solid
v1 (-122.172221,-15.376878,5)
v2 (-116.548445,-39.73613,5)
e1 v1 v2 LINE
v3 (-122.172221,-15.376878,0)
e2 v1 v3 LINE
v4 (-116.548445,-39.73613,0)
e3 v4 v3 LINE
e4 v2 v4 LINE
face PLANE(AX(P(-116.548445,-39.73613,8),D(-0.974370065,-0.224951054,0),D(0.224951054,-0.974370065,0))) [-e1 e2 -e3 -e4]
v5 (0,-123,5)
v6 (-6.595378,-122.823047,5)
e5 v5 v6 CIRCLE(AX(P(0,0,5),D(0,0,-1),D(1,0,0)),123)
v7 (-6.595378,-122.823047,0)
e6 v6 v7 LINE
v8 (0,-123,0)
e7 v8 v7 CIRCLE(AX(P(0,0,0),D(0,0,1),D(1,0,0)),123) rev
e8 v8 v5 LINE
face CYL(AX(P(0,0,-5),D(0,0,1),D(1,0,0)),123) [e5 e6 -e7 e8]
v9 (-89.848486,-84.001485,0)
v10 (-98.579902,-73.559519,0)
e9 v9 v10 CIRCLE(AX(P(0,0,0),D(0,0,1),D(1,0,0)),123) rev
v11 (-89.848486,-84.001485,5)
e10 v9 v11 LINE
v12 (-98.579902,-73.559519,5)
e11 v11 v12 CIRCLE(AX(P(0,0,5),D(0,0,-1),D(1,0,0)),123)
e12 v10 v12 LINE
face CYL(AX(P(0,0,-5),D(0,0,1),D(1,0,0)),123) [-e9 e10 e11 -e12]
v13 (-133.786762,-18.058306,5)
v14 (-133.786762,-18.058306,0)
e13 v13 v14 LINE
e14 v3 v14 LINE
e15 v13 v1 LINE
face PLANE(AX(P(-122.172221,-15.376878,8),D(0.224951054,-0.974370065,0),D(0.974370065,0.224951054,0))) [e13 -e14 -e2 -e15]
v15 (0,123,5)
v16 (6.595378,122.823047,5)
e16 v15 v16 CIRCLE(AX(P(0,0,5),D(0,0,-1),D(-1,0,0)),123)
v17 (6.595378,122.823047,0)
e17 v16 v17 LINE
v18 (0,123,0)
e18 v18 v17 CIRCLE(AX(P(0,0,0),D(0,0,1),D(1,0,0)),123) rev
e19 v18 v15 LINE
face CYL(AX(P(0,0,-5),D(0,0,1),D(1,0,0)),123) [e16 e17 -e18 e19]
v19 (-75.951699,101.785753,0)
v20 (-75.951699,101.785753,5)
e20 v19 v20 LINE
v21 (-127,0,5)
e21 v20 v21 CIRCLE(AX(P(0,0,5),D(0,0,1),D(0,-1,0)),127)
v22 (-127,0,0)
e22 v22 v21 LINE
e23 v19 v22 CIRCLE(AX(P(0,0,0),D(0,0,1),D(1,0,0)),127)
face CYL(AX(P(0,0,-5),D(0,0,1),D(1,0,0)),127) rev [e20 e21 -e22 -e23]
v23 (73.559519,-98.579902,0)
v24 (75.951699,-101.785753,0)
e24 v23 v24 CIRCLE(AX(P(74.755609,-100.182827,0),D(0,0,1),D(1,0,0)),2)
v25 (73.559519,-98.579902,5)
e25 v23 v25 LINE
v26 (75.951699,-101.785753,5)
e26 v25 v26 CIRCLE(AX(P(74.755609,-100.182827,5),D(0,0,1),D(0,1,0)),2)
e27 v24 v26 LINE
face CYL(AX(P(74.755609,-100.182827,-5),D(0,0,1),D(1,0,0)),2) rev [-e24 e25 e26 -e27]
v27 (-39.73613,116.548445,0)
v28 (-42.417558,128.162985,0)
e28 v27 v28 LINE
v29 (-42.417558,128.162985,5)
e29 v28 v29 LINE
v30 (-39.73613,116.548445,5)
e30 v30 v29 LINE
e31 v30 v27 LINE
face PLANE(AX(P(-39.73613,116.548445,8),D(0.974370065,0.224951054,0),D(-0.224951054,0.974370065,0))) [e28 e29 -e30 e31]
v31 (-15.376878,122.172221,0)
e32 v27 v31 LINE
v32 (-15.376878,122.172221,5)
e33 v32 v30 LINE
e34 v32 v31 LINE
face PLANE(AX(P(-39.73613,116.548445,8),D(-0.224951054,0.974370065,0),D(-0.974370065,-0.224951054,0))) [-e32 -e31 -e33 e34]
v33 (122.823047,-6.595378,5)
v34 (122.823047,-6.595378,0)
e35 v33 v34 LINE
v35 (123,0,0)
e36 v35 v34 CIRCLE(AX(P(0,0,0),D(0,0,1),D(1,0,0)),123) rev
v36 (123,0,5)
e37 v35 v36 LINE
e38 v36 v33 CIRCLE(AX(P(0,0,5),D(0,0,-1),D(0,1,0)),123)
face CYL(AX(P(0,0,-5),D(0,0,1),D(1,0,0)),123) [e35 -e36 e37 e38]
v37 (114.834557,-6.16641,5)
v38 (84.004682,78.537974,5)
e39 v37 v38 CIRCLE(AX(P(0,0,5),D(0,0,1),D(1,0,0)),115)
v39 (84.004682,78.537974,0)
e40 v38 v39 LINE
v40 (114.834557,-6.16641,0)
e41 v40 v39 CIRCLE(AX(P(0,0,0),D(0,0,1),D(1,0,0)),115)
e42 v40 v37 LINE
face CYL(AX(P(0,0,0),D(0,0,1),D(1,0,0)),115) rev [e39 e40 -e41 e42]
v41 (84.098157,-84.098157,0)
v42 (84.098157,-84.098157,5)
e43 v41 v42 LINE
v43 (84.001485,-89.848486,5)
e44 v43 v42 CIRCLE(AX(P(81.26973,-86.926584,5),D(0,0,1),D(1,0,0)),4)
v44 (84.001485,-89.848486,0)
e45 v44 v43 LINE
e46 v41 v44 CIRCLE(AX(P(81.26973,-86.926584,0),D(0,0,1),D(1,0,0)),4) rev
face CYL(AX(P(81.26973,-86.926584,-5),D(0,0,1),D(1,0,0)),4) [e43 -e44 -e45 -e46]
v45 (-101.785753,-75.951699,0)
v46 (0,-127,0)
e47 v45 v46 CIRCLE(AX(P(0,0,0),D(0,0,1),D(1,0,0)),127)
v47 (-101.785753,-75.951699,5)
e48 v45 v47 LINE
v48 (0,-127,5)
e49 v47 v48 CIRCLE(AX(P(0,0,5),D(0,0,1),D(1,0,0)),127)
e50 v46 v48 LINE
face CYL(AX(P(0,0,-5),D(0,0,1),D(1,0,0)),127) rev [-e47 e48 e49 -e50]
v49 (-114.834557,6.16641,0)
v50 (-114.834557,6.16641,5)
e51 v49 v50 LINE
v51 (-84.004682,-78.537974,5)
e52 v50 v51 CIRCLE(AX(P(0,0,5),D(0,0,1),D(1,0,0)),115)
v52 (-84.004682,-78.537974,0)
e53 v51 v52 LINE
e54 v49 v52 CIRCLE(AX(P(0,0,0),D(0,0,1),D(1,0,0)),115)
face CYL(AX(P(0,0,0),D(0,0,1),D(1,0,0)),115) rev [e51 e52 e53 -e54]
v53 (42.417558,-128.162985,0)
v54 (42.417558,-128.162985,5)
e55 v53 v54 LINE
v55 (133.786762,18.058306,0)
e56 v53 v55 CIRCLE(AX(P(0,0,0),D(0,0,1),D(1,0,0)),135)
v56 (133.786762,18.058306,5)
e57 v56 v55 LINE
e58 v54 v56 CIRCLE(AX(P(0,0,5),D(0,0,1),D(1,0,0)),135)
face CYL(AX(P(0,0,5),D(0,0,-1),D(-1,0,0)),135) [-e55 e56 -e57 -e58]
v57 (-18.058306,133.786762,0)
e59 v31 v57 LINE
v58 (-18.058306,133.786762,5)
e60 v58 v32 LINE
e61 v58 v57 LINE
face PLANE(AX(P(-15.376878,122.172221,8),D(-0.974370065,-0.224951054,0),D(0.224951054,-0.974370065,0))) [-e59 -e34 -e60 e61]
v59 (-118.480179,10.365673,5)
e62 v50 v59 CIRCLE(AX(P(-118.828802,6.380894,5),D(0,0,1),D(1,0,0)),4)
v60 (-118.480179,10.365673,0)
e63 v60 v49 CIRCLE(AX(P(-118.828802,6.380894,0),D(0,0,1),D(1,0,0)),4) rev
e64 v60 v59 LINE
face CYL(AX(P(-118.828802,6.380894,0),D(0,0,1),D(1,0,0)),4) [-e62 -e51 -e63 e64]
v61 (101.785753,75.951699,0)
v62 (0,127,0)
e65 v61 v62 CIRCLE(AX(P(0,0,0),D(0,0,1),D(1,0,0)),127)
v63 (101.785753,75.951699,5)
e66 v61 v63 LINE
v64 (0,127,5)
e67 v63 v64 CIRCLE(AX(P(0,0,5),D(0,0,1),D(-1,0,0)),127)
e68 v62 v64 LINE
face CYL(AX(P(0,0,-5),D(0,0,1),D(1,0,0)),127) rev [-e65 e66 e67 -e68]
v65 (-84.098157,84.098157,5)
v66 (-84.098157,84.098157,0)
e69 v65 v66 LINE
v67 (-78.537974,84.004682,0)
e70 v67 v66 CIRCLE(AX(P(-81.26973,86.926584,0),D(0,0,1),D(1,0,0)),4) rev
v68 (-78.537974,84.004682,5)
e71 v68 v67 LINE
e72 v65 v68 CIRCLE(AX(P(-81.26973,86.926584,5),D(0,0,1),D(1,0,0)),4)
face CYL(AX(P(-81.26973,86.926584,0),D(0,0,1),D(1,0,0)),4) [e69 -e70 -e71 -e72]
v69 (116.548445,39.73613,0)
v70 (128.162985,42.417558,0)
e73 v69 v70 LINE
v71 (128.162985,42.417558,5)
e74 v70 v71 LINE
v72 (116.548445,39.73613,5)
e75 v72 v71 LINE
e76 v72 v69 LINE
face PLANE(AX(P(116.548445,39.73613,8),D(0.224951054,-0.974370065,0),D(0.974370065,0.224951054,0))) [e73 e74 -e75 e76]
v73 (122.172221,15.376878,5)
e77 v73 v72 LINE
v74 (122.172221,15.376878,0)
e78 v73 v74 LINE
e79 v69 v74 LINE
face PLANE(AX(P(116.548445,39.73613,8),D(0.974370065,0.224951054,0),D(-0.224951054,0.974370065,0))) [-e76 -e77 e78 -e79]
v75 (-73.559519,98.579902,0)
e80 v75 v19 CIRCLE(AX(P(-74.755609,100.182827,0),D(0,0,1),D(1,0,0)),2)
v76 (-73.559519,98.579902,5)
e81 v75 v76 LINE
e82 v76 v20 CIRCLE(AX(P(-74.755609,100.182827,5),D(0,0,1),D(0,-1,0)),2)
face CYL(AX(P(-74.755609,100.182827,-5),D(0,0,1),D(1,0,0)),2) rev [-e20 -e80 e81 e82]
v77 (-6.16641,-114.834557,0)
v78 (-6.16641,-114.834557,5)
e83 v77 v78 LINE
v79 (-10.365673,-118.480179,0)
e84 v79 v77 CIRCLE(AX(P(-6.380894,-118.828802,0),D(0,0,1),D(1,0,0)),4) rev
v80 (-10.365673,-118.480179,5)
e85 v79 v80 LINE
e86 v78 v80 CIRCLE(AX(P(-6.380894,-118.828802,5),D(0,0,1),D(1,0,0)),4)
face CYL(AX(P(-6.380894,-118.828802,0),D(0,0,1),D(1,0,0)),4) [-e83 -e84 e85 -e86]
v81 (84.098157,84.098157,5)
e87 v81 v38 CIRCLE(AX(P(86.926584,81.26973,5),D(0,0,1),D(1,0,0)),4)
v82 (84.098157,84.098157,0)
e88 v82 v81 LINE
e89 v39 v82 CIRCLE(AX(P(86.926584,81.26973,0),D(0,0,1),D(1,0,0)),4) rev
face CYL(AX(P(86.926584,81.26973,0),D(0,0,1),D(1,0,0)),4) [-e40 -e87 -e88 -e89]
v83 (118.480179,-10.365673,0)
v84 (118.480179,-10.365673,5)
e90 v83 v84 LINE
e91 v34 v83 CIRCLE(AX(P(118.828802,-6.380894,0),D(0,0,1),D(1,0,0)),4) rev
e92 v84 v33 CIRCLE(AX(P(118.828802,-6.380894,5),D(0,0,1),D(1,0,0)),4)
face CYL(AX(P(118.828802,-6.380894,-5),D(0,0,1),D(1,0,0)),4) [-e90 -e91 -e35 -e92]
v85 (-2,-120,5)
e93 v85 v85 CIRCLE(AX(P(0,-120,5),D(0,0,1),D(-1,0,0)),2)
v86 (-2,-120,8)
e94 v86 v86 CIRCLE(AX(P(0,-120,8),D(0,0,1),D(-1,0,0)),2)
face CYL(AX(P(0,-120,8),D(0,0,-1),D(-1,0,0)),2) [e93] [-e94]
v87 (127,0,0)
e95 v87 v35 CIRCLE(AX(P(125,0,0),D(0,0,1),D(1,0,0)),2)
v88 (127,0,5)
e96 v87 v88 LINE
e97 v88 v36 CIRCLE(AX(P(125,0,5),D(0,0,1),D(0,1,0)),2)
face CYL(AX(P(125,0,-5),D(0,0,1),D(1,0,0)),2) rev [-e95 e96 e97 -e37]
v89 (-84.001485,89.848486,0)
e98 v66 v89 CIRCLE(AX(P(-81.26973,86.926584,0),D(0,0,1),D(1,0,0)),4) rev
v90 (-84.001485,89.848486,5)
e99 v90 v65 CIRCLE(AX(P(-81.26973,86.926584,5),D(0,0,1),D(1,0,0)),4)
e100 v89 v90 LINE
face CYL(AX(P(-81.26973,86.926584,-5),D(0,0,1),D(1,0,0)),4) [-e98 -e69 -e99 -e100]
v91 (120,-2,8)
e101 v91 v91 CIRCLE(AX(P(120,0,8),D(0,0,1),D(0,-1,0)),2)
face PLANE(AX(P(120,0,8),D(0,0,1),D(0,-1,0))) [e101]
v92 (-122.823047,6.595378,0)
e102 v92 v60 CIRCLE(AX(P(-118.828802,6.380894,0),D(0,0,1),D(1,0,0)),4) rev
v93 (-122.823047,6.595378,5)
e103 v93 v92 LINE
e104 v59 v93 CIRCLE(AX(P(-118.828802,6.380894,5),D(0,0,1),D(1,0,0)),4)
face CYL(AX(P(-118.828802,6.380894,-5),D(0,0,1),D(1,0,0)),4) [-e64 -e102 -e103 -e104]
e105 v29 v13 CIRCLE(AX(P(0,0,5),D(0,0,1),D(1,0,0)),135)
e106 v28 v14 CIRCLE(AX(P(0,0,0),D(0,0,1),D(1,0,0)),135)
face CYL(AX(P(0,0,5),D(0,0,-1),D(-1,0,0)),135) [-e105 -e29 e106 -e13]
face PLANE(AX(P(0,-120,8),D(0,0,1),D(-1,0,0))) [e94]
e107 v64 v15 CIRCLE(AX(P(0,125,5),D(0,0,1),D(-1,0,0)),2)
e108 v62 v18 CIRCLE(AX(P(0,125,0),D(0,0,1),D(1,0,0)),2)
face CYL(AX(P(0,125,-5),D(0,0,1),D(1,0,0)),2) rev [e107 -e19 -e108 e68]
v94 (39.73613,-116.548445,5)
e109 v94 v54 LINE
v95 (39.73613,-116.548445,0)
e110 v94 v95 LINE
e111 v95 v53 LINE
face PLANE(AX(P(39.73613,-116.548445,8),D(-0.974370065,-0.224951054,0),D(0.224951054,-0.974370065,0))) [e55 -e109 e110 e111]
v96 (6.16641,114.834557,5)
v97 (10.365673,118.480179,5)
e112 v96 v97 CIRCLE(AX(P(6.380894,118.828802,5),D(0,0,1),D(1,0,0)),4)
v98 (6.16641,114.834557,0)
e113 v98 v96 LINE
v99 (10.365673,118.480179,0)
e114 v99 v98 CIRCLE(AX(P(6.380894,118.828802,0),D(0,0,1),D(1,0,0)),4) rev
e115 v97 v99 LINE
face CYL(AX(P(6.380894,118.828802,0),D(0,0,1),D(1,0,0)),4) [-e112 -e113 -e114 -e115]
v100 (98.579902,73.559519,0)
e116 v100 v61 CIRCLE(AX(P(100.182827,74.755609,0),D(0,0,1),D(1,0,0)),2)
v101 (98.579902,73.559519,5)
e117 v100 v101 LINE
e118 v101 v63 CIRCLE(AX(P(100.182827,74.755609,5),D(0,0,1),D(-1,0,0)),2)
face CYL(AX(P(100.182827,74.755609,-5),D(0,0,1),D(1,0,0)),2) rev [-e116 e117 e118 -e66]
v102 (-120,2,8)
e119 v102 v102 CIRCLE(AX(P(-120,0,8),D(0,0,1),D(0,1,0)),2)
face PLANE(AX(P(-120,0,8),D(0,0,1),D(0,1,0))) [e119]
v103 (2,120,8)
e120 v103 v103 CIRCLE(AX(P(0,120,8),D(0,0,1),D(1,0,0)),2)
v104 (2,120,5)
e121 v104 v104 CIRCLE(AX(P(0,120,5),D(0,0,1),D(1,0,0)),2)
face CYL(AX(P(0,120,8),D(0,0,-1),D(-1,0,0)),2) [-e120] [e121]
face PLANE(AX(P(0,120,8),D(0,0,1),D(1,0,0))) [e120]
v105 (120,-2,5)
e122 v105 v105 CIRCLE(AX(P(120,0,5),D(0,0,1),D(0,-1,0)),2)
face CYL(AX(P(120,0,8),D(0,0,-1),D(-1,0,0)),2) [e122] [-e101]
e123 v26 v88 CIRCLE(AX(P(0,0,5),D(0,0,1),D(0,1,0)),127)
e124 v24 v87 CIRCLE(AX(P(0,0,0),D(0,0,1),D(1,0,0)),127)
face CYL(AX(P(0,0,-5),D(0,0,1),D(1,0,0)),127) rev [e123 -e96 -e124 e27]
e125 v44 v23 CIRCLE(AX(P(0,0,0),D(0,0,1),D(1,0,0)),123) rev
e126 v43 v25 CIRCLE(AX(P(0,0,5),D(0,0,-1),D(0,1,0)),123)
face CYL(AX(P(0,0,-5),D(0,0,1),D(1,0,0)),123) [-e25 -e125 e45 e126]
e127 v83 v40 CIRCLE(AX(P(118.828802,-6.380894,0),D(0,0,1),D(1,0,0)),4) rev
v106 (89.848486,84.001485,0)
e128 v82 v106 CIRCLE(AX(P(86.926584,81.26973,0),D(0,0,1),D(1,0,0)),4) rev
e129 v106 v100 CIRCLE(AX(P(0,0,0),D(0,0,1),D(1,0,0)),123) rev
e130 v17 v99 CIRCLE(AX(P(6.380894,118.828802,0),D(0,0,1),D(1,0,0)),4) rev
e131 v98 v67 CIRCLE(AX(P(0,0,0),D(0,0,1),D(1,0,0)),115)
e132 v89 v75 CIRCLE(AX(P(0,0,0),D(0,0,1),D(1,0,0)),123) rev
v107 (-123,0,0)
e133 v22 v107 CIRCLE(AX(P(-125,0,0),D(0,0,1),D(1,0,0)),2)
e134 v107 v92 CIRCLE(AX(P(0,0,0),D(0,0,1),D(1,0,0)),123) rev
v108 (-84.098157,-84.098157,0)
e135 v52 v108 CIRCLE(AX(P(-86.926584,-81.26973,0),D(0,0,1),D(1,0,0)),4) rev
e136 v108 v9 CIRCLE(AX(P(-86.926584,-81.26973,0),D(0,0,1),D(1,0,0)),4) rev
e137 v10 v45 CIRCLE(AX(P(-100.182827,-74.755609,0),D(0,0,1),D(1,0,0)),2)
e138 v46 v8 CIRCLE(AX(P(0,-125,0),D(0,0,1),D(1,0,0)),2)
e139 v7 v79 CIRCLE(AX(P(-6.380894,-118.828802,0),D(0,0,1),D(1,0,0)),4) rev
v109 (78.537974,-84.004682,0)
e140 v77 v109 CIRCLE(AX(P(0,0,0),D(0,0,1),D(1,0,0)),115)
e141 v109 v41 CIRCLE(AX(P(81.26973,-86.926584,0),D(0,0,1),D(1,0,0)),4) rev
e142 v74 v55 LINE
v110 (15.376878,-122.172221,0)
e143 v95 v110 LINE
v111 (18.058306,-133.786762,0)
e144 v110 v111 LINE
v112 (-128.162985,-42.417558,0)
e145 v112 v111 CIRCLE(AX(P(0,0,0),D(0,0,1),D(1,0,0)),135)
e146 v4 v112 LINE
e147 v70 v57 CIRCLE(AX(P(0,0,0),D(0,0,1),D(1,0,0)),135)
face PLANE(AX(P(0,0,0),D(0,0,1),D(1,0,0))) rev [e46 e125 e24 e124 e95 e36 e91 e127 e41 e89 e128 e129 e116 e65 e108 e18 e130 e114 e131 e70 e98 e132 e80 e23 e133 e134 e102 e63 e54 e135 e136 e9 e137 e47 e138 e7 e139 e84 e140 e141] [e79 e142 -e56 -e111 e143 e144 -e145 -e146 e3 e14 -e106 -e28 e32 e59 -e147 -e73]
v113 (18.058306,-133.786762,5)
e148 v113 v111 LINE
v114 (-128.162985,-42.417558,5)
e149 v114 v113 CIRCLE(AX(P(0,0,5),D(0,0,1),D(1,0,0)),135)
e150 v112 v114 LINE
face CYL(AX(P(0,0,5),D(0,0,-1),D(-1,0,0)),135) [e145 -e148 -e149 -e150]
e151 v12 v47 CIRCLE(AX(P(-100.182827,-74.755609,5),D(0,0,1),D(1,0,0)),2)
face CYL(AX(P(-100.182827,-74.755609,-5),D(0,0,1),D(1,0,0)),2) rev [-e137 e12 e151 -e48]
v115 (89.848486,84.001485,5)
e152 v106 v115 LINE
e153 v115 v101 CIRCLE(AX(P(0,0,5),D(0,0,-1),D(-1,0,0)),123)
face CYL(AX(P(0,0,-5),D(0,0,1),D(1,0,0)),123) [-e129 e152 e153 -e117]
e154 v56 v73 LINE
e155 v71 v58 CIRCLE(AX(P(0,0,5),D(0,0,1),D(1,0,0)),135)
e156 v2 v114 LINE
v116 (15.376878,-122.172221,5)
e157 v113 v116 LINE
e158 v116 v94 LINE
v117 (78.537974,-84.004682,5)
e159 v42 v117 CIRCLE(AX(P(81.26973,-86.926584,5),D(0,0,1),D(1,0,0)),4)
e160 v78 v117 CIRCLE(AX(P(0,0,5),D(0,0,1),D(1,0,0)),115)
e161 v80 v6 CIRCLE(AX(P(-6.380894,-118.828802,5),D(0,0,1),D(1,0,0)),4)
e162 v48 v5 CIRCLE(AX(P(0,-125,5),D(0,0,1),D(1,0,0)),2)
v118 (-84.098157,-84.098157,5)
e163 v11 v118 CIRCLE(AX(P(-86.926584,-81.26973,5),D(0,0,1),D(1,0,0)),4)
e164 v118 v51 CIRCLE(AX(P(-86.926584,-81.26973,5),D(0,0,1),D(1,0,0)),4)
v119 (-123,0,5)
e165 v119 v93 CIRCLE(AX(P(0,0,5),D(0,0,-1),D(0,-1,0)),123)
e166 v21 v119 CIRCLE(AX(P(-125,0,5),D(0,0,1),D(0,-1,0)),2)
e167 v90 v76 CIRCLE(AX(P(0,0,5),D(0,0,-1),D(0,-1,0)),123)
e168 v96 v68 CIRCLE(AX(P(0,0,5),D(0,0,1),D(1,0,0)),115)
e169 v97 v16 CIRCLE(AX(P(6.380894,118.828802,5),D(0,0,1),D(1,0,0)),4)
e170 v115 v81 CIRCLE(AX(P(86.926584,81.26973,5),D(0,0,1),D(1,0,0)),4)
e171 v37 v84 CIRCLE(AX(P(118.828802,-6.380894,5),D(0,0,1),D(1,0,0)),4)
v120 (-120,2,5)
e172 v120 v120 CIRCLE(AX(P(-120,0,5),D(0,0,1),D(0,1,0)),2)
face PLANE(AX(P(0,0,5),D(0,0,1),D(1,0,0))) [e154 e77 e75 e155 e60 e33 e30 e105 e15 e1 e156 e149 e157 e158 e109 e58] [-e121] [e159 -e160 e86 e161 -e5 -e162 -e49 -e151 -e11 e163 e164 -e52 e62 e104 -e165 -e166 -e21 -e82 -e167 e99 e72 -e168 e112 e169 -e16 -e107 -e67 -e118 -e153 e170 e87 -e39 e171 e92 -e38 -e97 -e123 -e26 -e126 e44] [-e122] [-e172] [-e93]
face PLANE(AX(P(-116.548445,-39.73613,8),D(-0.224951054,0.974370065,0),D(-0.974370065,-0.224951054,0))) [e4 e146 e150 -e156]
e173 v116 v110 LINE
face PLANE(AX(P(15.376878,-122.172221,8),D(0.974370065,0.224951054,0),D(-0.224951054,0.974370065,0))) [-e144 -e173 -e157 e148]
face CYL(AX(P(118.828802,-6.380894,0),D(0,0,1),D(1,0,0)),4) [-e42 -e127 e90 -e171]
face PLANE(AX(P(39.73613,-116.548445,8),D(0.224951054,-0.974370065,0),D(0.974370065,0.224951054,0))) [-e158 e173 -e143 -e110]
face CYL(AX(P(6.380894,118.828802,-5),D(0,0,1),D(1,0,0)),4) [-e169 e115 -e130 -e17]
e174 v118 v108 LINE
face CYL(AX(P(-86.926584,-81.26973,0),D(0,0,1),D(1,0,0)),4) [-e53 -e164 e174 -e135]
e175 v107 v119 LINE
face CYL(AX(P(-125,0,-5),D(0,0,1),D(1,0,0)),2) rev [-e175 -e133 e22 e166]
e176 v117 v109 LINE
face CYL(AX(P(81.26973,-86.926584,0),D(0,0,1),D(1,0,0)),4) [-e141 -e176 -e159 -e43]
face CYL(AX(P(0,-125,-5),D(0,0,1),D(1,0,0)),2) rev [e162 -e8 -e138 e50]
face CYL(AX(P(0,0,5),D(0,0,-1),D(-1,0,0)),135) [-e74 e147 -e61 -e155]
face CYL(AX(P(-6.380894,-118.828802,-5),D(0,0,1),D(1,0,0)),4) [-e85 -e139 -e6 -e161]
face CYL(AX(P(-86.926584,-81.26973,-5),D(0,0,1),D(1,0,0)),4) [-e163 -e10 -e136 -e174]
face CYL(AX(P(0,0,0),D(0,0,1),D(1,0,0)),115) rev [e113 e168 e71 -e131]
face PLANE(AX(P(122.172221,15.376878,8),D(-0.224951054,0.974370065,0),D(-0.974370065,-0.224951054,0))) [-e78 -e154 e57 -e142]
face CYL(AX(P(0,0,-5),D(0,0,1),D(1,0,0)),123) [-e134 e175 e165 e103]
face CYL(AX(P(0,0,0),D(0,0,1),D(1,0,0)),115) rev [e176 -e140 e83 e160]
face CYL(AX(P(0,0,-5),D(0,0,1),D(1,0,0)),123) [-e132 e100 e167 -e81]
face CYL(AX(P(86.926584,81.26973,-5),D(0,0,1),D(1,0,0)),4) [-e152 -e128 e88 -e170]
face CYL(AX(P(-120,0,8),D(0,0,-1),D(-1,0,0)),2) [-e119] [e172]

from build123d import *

# Parameters (mm, degrees)
SCHIZZO1_R                   = 135
ESTRUSIONE_ESTRUSIONE1_DEPTH = 5
SCHIZZO2_R                   = 115
TAGLIO_ESTRUSIONE1_DEPTH     = 191.984292548
SCHIZZO3_R                   = 2
ESTRUSIONE_ESTRUSIONE2_DEPTH = 3
RIPETIZIONECIRCOLARE1_COUNT  = 4
TAGLIO_ESTRUSIONE2_DEPTH     = 10
RIPETIZIONECIRCOLARE2_COUNT  = 4
TAGLIO_ESTRUSIONE21_DEPTH    = 8
RIPETIZIONECIRCOLARE3_COUNT  = 4
TAGLIO_ESTRUSIONE23_DEPTH    = 10
RIPETIZIONECIRCOLARE5_COUNT  = 4
RACCORDO1_R                  = 4
RACCORDO2_R                  = 4


with BuildPart() as part:
    # Schizzo1 → Estrusione-Estrusione1 (new body)
    with BuildSketch(Plane.XY):
        Circle(SCHIZZO1_R)
    extrude(amount=ESTRUSIONE_ESTRUSIONE1_DEPTH)

    # Schizzo2 → Taglio-Estrusione1 (cut, through all)
    with BuildSketch(Plane.XY.offset(5)):
        Circle(SCHIZZO2_R)
    extrude(amount=-TAGLIO_ESTRUSIONE1_DEPTH, mode=Mode.SUBTRACT)

    # Schizzo3 → Estrusione-Estrusione2 (add)
    with BuildSketch(Plane.XY.offset(5)):
        with Locations((0, 120)):
            Circle(SCHIZZO3_R)
    estrusione_estrusione2 = extrude(amount=ESTRUSIONE_ESTRUSIONE2_DEPTH)

    # RipetizioneCircolare1: Estrusione-Estrusione2 ×4 about axis
    ripetizionecircolare1_axis = Axis((0, 0, 0), (0, 0, 1))
    for i in range(1, RIPETIZIONECIRCOLARE1_COUNT):
        add(estrusione_estrusione2.rotate(ripetizionecircolare1_axis, i * 360 / RIPETIZIONECIRCOLARE1_COUNT))

    # Schizzo5 → Taglio-Estrusione2 (cut)
    with BuildSketch(Plane.XY.offset(5)):
        with BuildLine():
            ThreePointArc((-101.785752557, -75.95169897), (-56.934761924, -113.522829795), (0, -127))
            ThreePointArc((0, -127), (2, -125), (0, -123))
            ThreePointArc((0, -123), (-55.141541076, -109.947307596), (-98.579902083, -73.559519475))
            ThreePointArc((-98.579902083, -73.559519475), (-101.378917067, -73.152683985), (-101.785752557, -75.95169897))
        make_face()
    taglio_estrusione2 = extrude(amount=-TAGLIO_ESTRUSIONE2_DEPTH, mode=Mode.SUBTRACT)

    # RipetizioneCircolare2: Taglio-Estrusione2 ×4 about axis
    ripetizionecircolare2_axis = Axis((0, 0, 0), (0, 0, 1))
    for i in range(1, RIPETIZIONECIRCOLARE2_COUNT):
        add(taglio_estrusione2.rotate(ripetizionecircolare2_axis, i * 360 / RIPETIZIONECIRCOLARE2_COUNT), mode=Mode.SUBTRACT)

    # Schizzo14 → Taglio-Estrusione21 (cut)
    with BuildSketch(Plane.XY):
        Polygon((-39.736129967, 116.548444757), (-45.359906326, 140.907696377), (-21.000654706, 146.531472735), (-15.376878347, 122.172221115), align=None)
    taglio_estrusione21 = extrude(amount=TAGLIO_ESTRUSIONE21_DEPTH, mode=Mode.SUBTRACT)

    # RipetizioneCircolare3: Taglio-Estrusione21 ×4 about axis
    ripetizionecircolare3_axis = Axis((0, 0, 0), (0, 0, 1))
    for i in range(1, RIPETIZIONECIRCOLARE3_COUNT):
        add(taglio_estrusione21.rotate(ripetizionecircolare3_axis, i * 360 / RIPETIZIONECIRCOLARE3_COUNT), mode=Mode.SUBTRACT)

    # Schizzo15 → Taglio-Estrusione23 (cut)
    with BuildSketch(Plane.XY.offset(5)):
        with BuildLine():
            Line((-86.974134086, 86.974134086), (-81.317279836, 81.317279836))
            ThreePointArc((-81.317279836, 81.317279836), (-104.225395509, 48.6011001), (-114.562390281, 10.022910416))
            Line((-114.562390281, 10.022910416), (-122.531947865, 10.720156358))
            ThreePointArc((-122.531947865, 10.720156358), (-111.475857806, 51.982046194), (-86.974134086, 86.974134086))
        make_face()
    taglio_estrusione23 = extrude(amount=-TAGLIO_ESTRUSIONE23_DEPTH, mode=Mode.SUBTRACT)

    # RipetizioneCircolare5: Taglio-Estrusione23 ×4 about axis
    ripetizionecircolare5_axis = Axis((0, 0, 5), (0, 0, 1))
    for i in range(1, RIPETIZIONECIRCOLARE5_COUNT):
        add(taglio_estrusione23.rotate(ripetizionecircolare5_axis, i * 360 / RIPETIZIONECIRCOLARE5_COUNT), mode=Mode.SUBTRACT)

    # Raccordo1
    raccordo1_edges = [part.edges().sort_by_distance(p)[0] for p in [
        (-114.562390281, 10.022910416, 2.5),
        (-122.531947865, 10.720156358, 2.5),
    ]]
    fillet(raccordo1_edges, radius=RACCORDO1_R - 0.0001)  # a hair under: the kernel refuses the full size

    # Raccordo2
    raccordo2_edges = [part.edges().sort_by_distance(p)[0] for p in [
        (-81.317279836, -81.317279836, 2.5),
        (-86.974134086, -86.974134086, 2.5),
        (-10.022910416, -114.562390281, 2.5),
        (-10.720156358, -122.531947865, 2.5),
        (86.974134086, -86.974134086, 2.5),
        (81.317279836, -81.317279836, 2.5),
        (114.562390281, -10.022910416, 2.5),
        (122.531947865, -10.720156358, 2.5),
        (86.974134086, 86.974134086, 2.5),
        (81.317279836, 81.317279836, 2.5),
        (10.720156358, 122.531947865, 2.5),
        (10.022910416, 114.562390281, 2.5),
        (-81.317279836, 81.317279836, 2.5),
        (-86.974134086, 86.974134086, 2.5),
    ]]
    fillet(raccordo2_edges, radius=RACCORDO2_R - 0.0001)  # a hair under: the kernel refuses the full size


solid = part.part
